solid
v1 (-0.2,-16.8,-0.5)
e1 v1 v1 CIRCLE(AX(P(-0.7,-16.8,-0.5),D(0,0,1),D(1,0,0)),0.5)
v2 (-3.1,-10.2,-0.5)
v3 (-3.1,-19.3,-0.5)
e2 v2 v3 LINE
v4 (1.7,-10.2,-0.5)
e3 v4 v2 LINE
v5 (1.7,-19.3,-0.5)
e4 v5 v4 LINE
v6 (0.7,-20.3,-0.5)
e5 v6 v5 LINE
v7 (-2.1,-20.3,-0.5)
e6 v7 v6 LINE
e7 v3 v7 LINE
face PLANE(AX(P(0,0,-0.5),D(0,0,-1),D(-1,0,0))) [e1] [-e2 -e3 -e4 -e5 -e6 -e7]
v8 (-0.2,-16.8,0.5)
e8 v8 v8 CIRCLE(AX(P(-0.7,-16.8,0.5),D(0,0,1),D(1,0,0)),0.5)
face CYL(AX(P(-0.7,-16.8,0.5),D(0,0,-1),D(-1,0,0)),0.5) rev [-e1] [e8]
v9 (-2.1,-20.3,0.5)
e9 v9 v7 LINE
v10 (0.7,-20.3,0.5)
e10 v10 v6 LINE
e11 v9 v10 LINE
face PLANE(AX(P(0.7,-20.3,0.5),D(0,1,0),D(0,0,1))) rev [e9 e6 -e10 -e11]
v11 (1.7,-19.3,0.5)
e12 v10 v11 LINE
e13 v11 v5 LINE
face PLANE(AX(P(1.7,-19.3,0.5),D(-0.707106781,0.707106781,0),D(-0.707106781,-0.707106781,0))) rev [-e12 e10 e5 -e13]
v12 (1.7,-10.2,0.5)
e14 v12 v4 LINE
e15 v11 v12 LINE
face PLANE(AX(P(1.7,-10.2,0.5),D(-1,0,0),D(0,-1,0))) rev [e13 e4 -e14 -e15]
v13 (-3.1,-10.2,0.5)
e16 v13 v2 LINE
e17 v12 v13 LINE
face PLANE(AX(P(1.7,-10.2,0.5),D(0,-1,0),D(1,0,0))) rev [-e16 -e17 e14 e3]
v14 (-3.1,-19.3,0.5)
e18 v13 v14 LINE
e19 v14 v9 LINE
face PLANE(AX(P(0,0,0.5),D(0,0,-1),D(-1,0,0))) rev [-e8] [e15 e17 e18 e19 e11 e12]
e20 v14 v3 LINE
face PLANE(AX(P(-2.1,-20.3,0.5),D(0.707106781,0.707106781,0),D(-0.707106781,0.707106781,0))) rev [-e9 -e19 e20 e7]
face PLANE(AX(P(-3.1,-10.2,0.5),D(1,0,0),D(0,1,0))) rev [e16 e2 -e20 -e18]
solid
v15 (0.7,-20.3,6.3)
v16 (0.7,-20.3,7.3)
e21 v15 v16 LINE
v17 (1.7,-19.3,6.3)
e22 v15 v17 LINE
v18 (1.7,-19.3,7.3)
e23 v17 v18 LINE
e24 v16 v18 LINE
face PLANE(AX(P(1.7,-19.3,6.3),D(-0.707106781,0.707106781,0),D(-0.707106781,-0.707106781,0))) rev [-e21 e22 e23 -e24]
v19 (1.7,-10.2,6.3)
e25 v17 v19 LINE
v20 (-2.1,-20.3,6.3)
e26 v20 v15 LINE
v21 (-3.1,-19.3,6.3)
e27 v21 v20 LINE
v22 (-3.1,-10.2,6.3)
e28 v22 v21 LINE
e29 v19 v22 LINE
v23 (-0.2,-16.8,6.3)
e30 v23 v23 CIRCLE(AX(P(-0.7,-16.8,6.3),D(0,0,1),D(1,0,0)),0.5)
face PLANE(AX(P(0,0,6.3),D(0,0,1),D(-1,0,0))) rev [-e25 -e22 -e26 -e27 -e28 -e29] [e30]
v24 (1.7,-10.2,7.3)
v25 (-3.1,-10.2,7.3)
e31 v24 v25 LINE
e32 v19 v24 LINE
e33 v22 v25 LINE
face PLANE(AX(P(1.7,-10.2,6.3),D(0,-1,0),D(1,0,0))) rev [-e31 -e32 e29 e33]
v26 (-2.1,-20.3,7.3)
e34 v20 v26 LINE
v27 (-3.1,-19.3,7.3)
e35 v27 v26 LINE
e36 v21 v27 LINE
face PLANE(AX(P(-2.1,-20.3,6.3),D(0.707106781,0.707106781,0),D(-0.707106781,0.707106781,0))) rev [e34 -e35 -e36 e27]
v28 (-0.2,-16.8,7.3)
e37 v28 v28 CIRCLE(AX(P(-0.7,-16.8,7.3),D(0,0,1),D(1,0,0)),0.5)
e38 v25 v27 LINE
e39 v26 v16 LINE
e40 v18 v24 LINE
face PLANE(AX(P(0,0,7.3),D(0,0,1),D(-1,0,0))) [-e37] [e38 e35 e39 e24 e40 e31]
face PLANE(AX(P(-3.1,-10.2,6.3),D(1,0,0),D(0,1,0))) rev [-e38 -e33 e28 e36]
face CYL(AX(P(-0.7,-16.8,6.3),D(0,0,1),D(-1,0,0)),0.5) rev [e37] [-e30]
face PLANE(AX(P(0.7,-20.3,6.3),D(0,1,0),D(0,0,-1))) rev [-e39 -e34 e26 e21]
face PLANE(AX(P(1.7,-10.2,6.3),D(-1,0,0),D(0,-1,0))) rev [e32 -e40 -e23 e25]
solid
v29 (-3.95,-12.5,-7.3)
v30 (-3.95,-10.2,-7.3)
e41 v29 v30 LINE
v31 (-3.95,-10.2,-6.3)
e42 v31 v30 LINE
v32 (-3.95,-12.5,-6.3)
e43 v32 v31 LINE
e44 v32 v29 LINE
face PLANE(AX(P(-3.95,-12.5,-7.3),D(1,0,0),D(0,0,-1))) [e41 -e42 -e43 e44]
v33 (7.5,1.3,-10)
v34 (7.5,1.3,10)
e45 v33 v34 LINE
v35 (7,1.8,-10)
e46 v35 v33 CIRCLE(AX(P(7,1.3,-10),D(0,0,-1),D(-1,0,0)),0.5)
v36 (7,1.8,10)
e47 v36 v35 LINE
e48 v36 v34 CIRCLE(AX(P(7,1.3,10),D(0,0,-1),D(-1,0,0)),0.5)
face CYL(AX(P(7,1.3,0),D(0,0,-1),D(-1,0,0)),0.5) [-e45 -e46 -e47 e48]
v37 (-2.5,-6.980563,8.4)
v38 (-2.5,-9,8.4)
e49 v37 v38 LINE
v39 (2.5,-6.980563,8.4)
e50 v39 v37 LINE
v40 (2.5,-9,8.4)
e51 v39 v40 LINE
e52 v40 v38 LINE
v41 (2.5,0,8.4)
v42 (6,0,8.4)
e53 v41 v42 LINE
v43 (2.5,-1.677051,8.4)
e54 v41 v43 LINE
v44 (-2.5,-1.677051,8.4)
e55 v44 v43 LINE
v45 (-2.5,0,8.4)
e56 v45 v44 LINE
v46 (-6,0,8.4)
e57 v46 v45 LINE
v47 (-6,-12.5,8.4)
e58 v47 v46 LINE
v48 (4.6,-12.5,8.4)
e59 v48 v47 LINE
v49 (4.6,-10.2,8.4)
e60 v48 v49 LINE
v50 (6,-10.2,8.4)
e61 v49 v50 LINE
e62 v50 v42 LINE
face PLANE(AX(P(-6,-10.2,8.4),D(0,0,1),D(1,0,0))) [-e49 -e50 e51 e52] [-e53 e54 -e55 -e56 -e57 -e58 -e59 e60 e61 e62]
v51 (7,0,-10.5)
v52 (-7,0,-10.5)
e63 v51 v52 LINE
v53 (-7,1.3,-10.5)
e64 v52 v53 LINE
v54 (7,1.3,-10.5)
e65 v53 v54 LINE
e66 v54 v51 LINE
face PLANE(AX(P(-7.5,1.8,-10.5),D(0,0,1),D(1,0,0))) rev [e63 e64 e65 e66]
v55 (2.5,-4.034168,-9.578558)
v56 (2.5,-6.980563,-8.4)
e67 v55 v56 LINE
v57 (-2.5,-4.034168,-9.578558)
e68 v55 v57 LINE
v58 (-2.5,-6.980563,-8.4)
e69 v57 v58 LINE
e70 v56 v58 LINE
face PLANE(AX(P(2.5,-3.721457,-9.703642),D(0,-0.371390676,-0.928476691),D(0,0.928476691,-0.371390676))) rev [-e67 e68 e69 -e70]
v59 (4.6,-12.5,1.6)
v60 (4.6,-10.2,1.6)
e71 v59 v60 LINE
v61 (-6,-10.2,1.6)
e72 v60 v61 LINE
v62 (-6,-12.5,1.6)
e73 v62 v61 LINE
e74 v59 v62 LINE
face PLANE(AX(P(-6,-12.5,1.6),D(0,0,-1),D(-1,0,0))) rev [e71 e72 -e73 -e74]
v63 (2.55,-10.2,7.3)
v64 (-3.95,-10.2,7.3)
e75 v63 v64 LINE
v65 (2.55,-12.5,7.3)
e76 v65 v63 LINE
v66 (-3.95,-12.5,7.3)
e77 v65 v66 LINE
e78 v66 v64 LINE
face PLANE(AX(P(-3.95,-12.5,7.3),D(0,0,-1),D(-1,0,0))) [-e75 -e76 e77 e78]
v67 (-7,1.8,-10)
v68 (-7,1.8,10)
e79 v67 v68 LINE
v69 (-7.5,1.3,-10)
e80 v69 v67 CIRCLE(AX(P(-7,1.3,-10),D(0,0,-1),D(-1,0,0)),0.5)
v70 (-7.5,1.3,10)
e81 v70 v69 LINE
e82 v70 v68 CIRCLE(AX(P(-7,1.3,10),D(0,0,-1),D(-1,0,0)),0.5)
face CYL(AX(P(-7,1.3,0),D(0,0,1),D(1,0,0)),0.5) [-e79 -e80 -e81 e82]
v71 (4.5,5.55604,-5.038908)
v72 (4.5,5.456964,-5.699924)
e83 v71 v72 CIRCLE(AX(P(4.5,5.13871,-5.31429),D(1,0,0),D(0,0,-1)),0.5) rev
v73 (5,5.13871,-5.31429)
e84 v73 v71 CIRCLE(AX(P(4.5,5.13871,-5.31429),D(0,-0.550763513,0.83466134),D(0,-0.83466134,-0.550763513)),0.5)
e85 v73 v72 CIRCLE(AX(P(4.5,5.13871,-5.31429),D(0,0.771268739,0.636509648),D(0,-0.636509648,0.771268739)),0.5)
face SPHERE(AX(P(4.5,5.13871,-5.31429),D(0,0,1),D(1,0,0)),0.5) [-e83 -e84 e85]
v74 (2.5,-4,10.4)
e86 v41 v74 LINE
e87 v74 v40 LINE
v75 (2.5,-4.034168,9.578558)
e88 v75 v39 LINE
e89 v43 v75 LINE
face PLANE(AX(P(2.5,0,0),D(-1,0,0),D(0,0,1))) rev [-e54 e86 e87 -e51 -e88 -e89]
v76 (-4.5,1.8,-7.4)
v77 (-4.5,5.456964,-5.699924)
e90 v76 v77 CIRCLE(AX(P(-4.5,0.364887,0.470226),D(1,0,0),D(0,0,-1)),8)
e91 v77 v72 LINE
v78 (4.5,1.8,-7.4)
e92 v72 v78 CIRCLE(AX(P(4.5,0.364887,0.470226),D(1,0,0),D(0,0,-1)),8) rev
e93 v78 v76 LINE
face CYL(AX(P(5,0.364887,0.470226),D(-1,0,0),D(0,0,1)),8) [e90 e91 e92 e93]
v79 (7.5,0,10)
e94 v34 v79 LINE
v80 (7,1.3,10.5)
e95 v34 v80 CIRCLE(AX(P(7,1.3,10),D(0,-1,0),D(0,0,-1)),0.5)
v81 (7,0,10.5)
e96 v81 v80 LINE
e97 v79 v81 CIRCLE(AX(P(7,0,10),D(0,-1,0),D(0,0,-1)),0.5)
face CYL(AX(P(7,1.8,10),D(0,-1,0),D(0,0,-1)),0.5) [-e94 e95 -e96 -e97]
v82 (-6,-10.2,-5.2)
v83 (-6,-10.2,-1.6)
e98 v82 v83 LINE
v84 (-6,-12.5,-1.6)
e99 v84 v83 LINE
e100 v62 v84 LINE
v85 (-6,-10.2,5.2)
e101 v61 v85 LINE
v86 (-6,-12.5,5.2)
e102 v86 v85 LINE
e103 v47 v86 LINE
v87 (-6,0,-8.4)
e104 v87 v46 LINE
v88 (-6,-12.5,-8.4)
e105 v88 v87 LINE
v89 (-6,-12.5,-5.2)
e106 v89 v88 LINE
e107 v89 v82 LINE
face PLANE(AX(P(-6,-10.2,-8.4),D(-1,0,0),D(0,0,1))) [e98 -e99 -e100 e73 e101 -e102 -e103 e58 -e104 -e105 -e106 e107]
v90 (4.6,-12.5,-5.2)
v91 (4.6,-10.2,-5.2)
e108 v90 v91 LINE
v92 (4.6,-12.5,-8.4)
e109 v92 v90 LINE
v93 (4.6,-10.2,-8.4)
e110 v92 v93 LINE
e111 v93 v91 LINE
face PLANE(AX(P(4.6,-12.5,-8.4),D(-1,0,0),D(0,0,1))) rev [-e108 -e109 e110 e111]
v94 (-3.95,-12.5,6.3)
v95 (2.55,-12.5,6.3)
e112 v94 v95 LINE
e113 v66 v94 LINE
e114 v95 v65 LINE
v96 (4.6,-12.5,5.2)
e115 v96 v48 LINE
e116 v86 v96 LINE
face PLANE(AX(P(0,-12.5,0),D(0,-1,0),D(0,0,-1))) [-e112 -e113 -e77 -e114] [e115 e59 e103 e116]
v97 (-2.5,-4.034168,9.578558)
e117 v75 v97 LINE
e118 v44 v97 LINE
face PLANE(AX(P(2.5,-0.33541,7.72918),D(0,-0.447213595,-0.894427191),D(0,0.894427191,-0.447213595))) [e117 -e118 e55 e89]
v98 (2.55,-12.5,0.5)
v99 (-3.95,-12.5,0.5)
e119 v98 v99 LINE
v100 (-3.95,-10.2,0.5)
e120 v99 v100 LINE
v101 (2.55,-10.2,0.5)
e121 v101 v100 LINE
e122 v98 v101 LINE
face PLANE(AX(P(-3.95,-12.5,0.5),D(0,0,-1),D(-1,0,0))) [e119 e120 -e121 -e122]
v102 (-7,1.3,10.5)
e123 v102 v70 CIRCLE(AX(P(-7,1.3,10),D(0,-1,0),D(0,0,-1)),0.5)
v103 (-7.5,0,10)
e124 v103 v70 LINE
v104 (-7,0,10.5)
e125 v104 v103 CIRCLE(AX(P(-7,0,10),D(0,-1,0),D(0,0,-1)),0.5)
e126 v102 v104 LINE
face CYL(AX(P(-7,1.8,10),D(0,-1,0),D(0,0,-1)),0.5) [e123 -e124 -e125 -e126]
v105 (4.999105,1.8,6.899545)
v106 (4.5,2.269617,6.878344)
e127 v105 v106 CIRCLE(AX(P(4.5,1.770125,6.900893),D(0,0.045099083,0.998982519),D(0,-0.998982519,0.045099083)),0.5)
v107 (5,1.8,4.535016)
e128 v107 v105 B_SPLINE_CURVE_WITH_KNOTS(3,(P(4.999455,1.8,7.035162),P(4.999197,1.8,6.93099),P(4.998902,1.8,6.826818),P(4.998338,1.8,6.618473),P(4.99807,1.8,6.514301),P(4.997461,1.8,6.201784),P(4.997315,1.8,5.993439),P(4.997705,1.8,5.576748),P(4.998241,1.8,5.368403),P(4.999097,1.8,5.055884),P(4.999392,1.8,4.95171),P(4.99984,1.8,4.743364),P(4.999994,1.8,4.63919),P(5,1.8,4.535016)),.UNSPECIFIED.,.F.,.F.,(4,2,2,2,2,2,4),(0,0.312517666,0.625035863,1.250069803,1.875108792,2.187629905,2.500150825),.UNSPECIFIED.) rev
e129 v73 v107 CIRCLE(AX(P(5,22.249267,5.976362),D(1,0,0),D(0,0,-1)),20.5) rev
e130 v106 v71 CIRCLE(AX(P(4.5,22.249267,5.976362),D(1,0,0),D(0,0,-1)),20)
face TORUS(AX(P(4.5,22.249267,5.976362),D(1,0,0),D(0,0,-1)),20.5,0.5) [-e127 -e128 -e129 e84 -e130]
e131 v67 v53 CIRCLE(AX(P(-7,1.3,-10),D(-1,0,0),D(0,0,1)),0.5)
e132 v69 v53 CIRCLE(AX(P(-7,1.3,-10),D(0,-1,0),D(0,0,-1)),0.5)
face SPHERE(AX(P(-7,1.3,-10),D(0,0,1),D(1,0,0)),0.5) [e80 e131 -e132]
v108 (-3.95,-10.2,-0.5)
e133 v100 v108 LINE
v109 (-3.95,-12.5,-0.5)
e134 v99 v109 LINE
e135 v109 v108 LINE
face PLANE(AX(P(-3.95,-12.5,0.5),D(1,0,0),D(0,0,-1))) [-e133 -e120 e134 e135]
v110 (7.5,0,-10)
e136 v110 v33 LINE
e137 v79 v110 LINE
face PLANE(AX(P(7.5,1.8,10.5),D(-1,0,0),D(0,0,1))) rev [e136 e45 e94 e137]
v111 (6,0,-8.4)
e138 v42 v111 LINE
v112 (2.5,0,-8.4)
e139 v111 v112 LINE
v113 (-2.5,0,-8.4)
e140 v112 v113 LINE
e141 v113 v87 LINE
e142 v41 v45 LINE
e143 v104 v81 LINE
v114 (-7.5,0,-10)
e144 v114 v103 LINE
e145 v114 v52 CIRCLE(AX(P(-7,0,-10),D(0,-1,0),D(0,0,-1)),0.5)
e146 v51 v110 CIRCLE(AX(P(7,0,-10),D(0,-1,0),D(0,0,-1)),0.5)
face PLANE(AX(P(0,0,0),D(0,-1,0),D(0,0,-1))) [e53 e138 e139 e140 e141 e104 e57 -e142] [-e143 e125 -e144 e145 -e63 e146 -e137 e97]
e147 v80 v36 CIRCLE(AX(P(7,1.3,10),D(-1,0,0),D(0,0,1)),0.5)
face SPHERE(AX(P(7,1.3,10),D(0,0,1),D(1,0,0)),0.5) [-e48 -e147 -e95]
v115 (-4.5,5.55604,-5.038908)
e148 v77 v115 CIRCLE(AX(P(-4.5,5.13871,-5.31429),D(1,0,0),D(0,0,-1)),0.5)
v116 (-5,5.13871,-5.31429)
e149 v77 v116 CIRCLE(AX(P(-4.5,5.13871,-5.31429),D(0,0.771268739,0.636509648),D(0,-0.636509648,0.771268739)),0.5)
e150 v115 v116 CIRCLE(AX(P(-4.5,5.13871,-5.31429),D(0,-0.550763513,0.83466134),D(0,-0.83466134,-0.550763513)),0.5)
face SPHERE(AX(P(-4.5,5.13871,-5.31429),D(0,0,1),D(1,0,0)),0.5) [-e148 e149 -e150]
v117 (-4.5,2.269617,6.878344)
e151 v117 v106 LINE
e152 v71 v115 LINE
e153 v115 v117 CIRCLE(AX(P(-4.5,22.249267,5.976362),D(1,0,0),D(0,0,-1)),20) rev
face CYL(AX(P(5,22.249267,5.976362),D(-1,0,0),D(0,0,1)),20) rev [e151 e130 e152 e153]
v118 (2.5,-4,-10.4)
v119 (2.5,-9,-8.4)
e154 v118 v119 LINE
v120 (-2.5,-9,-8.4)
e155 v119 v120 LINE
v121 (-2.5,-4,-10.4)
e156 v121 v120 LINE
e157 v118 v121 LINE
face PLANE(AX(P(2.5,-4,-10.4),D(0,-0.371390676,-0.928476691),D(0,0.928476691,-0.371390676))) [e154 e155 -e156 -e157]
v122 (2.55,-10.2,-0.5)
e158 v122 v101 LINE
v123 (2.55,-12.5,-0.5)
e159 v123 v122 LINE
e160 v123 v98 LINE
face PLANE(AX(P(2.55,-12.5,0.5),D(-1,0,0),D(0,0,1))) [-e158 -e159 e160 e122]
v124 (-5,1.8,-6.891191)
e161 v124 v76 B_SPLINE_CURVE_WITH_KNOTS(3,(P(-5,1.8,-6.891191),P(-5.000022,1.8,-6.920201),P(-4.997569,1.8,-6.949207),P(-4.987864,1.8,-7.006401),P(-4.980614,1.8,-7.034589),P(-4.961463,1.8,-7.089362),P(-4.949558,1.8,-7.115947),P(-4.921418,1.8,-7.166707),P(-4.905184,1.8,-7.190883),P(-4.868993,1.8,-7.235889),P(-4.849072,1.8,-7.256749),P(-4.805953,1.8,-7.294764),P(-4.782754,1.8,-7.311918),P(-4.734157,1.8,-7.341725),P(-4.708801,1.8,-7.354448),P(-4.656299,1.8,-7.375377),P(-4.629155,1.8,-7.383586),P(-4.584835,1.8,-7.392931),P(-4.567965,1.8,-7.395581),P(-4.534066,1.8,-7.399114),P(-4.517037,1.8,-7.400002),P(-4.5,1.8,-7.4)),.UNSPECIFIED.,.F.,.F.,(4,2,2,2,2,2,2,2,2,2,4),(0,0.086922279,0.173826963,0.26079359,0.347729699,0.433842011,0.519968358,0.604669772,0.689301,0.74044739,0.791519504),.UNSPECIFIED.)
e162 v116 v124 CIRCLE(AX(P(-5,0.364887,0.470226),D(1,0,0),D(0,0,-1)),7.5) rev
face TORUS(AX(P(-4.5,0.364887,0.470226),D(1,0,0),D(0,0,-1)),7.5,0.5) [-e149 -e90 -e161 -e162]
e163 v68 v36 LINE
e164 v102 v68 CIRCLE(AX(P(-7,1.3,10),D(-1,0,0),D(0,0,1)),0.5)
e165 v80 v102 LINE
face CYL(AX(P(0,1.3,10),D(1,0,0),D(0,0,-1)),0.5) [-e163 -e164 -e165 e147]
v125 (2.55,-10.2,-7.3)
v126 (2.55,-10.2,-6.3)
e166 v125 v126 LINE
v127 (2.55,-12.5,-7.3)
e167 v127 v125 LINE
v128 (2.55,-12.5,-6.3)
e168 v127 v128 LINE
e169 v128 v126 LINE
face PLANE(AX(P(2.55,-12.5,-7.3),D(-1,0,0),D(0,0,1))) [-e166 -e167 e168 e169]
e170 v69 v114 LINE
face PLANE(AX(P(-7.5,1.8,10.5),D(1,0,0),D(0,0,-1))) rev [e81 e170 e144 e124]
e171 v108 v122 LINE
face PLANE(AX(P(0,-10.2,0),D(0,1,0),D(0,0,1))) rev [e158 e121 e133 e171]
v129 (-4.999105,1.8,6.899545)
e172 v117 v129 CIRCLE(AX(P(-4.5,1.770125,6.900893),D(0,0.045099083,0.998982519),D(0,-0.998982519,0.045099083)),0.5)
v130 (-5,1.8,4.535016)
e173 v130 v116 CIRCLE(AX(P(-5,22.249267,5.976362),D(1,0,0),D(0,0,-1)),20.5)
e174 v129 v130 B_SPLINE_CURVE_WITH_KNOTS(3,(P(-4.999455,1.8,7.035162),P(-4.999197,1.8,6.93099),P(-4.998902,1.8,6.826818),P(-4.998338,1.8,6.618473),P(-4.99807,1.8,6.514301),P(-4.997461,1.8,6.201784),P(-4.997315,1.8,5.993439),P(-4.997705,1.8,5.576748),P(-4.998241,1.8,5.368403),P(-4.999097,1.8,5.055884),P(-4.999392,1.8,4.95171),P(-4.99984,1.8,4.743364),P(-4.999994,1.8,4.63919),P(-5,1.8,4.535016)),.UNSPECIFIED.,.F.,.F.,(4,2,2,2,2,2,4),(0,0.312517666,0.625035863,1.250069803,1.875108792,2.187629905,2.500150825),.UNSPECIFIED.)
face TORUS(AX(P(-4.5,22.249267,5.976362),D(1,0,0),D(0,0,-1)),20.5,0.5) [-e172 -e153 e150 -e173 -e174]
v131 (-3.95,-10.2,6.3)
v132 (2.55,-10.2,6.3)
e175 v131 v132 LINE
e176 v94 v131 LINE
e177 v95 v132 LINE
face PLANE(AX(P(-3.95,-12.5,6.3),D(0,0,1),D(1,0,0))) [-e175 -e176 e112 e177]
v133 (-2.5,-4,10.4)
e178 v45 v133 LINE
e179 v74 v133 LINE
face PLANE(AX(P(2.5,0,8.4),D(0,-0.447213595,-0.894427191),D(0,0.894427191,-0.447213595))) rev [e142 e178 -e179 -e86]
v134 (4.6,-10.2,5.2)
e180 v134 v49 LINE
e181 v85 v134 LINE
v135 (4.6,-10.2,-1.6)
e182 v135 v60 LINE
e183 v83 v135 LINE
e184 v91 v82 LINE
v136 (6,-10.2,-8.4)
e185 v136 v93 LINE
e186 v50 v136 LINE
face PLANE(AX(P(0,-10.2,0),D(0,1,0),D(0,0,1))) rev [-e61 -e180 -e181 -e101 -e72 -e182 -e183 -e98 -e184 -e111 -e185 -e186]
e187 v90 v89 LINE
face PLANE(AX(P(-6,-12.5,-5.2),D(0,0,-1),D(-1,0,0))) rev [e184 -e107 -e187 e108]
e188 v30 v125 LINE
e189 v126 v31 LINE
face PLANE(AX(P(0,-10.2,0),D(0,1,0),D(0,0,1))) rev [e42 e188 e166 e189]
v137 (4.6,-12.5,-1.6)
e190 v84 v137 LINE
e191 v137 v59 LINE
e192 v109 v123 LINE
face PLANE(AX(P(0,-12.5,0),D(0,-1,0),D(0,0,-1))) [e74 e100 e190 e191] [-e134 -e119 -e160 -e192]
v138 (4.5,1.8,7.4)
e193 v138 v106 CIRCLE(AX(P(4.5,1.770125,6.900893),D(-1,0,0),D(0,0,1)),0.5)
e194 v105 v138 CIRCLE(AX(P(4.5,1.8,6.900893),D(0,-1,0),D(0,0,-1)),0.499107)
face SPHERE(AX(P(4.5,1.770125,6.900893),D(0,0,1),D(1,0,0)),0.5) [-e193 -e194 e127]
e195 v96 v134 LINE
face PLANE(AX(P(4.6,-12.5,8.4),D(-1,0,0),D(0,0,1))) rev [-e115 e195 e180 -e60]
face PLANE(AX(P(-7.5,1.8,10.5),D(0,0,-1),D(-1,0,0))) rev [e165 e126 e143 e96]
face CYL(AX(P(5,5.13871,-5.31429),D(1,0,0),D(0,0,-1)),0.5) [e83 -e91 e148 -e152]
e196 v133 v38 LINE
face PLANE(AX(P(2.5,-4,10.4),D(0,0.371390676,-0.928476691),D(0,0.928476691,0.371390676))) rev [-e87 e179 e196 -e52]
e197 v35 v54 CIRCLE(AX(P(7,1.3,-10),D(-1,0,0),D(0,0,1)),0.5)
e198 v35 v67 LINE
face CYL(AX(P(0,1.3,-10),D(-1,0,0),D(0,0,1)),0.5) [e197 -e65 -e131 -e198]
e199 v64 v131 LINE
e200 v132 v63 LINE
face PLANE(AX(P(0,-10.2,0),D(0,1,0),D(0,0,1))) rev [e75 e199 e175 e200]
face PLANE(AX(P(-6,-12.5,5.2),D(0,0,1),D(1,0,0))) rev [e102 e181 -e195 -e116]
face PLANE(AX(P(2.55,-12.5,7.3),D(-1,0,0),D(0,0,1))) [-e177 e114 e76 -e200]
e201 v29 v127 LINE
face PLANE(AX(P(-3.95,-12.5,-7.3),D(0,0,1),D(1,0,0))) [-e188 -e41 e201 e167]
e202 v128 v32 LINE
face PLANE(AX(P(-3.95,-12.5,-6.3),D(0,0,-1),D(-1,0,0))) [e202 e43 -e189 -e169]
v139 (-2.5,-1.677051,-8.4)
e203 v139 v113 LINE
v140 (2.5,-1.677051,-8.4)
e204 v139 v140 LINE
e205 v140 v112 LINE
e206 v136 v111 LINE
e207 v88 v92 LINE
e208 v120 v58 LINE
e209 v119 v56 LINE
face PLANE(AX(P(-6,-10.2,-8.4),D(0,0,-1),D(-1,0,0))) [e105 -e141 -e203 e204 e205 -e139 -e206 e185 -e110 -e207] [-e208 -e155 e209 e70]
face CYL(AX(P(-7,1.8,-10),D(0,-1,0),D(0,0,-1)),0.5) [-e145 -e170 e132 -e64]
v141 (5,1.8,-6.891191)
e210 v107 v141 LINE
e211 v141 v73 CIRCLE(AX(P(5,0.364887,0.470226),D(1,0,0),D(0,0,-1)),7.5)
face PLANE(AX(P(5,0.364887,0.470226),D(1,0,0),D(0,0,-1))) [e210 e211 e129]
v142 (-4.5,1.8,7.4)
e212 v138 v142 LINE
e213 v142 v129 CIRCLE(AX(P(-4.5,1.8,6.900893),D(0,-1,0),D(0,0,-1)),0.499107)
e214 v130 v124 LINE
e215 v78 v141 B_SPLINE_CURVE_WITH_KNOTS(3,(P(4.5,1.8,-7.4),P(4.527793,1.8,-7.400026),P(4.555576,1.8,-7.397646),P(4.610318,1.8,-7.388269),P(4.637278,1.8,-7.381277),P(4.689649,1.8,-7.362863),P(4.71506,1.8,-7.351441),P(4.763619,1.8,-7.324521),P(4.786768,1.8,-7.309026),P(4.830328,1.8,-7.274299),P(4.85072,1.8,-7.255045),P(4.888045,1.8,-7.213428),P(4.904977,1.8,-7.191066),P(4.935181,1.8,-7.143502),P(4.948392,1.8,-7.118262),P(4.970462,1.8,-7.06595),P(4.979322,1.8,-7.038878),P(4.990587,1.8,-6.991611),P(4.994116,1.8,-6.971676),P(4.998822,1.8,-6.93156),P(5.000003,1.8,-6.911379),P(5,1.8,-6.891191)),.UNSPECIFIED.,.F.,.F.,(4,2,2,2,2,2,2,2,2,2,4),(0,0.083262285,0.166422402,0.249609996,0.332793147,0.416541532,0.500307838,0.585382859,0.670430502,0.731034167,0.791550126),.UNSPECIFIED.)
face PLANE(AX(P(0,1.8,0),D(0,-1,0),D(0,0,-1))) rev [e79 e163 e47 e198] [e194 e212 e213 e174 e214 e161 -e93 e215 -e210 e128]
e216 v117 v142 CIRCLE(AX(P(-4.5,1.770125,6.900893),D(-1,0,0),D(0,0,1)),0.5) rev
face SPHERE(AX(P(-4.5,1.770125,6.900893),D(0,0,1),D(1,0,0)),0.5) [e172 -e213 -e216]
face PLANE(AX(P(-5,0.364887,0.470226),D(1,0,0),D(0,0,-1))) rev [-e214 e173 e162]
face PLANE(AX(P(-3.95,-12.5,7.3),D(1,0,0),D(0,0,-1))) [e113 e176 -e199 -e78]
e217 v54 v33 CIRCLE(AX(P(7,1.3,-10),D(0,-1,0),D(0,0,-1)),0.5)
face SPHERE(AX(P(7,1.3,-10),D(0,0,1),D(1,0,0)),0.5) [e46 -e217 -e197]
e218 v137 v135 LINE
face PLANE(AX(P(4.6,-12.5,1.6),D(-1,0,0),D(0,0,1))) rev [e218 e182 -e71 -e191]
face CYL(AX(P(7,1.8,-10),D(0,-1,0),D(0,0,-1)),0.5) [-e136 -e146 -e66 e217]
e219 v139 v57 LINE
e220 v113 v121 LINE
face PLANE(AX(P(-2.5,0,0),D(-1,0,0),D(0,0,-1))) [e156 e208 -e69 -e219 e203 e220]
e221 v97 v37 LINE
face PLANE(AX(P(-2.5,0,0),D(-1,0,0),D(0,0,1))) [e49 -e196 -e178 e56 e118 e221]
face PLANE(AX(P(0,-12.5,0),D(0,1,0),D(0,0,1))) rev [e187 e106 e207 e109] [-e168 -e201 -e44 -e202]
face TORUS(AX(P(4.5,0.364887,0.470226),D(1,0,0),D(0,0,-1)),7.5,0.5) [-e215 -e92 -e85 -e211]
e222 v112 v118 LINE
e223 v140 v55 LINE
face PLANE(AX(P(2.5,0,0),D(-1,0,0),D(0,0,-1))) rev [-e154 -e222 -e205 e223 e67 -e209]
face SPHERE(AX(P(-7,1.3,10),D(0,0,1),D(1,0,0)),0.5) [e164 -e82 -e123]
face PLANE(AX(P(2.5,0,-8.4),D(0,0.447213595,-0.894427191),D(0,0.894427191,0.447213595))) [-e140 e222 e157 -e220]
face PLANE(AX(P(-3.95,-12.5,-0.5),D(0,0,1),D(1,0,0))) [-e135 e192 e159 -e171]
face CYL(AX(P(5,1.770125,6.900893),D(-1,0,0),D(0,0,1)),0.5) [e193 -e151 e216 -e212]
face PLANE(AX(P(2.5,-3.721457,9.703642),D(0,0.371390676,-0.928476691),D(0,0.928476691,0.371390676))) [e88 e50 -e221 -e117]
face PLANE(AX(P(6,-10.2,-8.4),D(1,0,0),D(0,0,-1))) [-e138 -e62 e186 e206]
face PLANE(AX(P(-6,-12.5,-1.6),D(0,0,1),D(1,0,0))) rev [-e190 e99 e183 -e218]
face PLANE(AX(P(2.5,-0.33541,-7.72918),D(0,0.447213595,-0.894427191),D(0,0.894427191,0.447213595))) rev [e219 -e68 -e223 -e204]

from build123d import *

# Parameters (mm, degrees)
SKETCH1_W           = 15
SKETCH1_H           = 21
BOSS_EXTRUDE1_DEPTH = 1.8
SKETCH2_W           = 12
SKETCH2_H           = 16.8
BOSS_EXTRUDE2_DEPTH = 10.2
SKETCH3_W           = 10.6
SKETCH3_H           = 3.2
SKETCH3_W_2         = 6.5
SKETCH3_H_2         = 1
BOSS_EXTRUDE3_DEPTH = 2.3
SKETCH4_R           = 0.5
BOSS_EXTRUDE4_DEPTH = 1
EXTRUDE_THIN1_DEPTH = 2.5
BOSS_EXTRUDE5_DEPTH = 5
FILLET1_R           = 0.5
FILLET2_R           = 0.5


with BuildPart() as part:
    # Sketch1 → Boss-Extrude1 (new body)
    with BuildSketch(Plane(origin=(0, 0, 0), x_dir=(1, 0, 0), z_dir=(0, 1, 0))):
        Rectangle(SKETCH1_W, SKETCH1_H)
    extrude(amount=BOSS_EXTRUDE1_DEPTH)

    # Sketch2 → Boss-Extrude2 (add)
    with BuildSketch(Plane(origin=(0, 0, 0), x_dir=(1, 0, 0), z_dir=(0, 1, 0))):
        Rectangle(SKETCH2_W, SKETCH2_H)
    extrude(amount=-BOSS_EXTRUDE2_DEPTH)

    # Sketch3 → Boss-Extrude3 (add)
    # profile 1 of 3: a face of its own
    with BuildSketch(Plane.XZ.offset(10.2)):
        with Locations((-0.7, 6.8)):
            Rectangle(SKETCH3_W, SKETCH3_H)
        with Locations((-0.7, 6.8)):
            Rectangle(SKETCH3_W_2, SKETCH3_H_2, mode=Mode.SUBTRACT)
    # profile 2 of 3: a face of its own
    with BuildSketch(Plane.XZ.offset(10.2)):
        with Locations((-0.7, -6.8)):
            Rectangle(SKETCH3_W, SKETCH3_H)
        with Locations((-0.7, -6.8)):
            Rectangle(SKETCH3_W_2, SKETCH3_H_2, mode=Mode.SUBTRACT)
    # profile 3 of 3: a face of its own
    with BuildSketch(Plane.XZ.offset(10.2)):
        with Locations((-0.7, 0)):
            Rectangle(SKETCH3_W, SKETCH3_H)
        with Locations((-0.7, 0)):
            Rectangle(SKETCH3_W_2, SKETCH3_H_2, mode=Mode.SUBTRACT)
    extrude(amount=BOSS_EXTRUDE3_DEPTH)

    # Sketch5 → Extrude-Thin1 (add, symmetric)
    with BuildSketch(Plane(origin=(0, 0, 0), x_dir=(0, 0, -1), z_dir=(1, 0, 0))):
        Polygon((-8.4, 0), (-10.4, -4), (-8.4, -9), (-7.703642482, -8.721456993), (-9.57855827, -4.034167523), (-7.729179607, -0.335410197), align=None)
    extrude_thin1 = extrude(amount=EXTRUDE_THIN1_DEPTH, both=True)

    # Mirror2: Extrude-Thin1 across plane
    add(extrude_thin1.mirror(Plane.XY))

    # Sketch6 → Boss-Extrude5 (add, symmetric)
    with BuildSketch(Plane(origin=(0, 0, 0), x_dir=(0, 0, -1), z_dir=(1, 0, 0))):
        with BuildLine():
            Line((-7.4, 2.3), (-7.4, 1.8))
            Line((-7.4, 1.8), (7.4, 1.8))
            ThreePointArc((7.4, 1.8), (6.685191913, 3.942595957), (5.4, 5.8))
            ThreePointArc((5.4, 5.8), (-0.701262123, 2.957472908), (-7.4, 2.3))
        make_face()
    extrude(amount=BOSS_EXTRUDE5_DEPTH, both=True)

    # Fillet1
    # the kernel refuses this fillet: 0.5 mm, written as the material it takes off along each edge
    with BuildSketch(Plane(origin=(6.139155456, 5.8, -5.4), x_dir=(0, -0.7528288222325751, -0.658216350766155), z_dir=(-1, 0, 0))) as fillet1_piece_1:
        with BuildLine():
            CenterArc((0.441422739, 0.499797197), FILLET1_R, 187.744574116, 83.887366527)
            ThreePointArc((-0.054016593, 0.43241865), (-0.025830517, 0.21635645), (0, 0))
            ThreePointArc((0, 0), (0.227831091, -0.003244846), (0.455662182, 0))
        make_face()
    extrude(amount=12.278310911, mode=Mode.SUBTRACT)
    with BuildSketch(Plane(origin=(7.5, -1.25, -10.5), x_dir=(0, 0, 1), z_dir=(0, 1, 0)), Plane(origin=(7.5, -1.25, 10.5), x_dir=(-1, 0, 0), z_dir=(0, 1, 0))) as fillet1_piece_2:
        with BuildLine():
            CenterArc((FILLET1_R, -FILLET1_R), FILLET1_R, 90, 90)
            Line((0, -FILLET1_R), (0, 0))
            Line((0, 0), (FILLET1_R, 0))
        make_face()
    extrude(amount=4.3, mode=Mode.SUBTRACT)
    with BuildSketch(Plane(origin=(-7.5, -1.25, 10.5), x_dir=(1, 0, 0), z_dir=(0, 1, 0)), Plane(origin=(-7.5, -1.25, -10.5), x_dir=(0, 0, 1), z_dir=(0, 1, 0))) as fillet1_piece_3:
        with BuildLine():
            CenterArc((FILLET1_R, FILLET1_R), FILLET1_R, 180, 90)
            Line((0, FILLET1_R), (0, 0))
            Line((0, 0), (FILLET1_R, 0))
        make_face()
    extrude(amount=4.3, mode=Mode.SUBTRACT)
    with BuildSketch(Plane(origin=(6.324787276, 2.3, 7.4), x_dir=(0, -1, 0), z_dir=(-1, 0, 0))) as fillet1_piece_4_section:
        with BuildLine():
            CenterArc((0.529914911, -0.5), FILLET1_R, 90, 92.582364675)
            ThreePointArc((0.030422668, -0.522527754), (0.016920767, -0.26116435), (0, 0))
            Line((0, 0), (0.529914911, 0))
        make_face()
    fillet1_piece_4 = extrude(amount=12.649574553, mode=Mode.PRIVATE)
    fillet1_piece_4 = split(fillet1_piece_4, bisect_by=Plane(origin=(0, 1.8, 7.280360026), z_dir=(0, 1, 0)), keep=Keep.TOP, mode=Mode.PRIVATE)
    add(fillet1_piece_4, mode=Mode.SUBTRACT)

    # Fillet2
    # the kernel refuses this fillet: 0.5 mm, written as the material it takes off along each edge
    with BuildSketch(Plane(origin=(-5, 0.364887193, 0.470225615), x_dir=(0, 0.024106503791178756, -0.999709396012144), z_dir=(0, -0.999709396012144, -0.024106503791178756))) as fillet2_piece_1_section:
        with BuildLine():
            CenterArc((8 - FILLET2_R, FILLET2_R), FILLET2_R, 270, 90)
            Line((8 - FILLET2_R, 0), (8, 0))
            Line((8, 0), (8, FILLET2_R))
        make_face()
    fillet2_piece_1 = revolve(axis=Axis((-5, 0.364887193, 0.470225615), (1, 0, 0)), revolution_arc=38.150707639, mode=Mode.PRIVATE)
    fillet2_piece_1 = split(fillet2_piece_1, bisect_by=Plane(origin=(-4.858036818, 1.8, -6.655446505), z_dir=(0, 1, 0)), keep=Keep.TOP, mode=Mode.PRIVATE)
    add(fillet2_piece_1, mode=Mode.SUBTRACT)
    with BuildSketch(Plane(origin=(5, 0.364887193, 0.470225615), x_dir=(0, 0.024106503791178756, -0.999709396012144), z_dir=(0, -0.999709396012144, -0.024106503791178756))) as fillet2_piece_2_section:
        with BuildLine():
            CenterArc((8 - FILLET2_R, -FILLET2_R), FILLET2_R, 0, 90)
            Line((8, -FILLET2_R), (8, 0))
            Line((8, 0), (8 - FILLET2_R, 0))
        make_face()
    fillet2_piece_2 = revolve(axis=Axis((5, 0.364887193, 0.470225615), (1, 0, 0)), revolution_arc=38.150707639, mode=Mode.PRIVATE)
    fillet2_piece_2 = split(fillet2_piece_2, bisect_by=Plane(origin=(4.858036818, 1.8, -6.655446505), z_dir=(0, 1, 0)), keep=Keep.TOP, mode=Mode.PRIVATE)
    add(fillet2_piece_2, mode=Mode.SUBTRACT)
    with BuildSketch(Plane(origin=(-5, 22.249267031, 5.976362079), x_dir=(0, -0.8346613404304445, -0.5507635125812654), z_dir=(0, 0.5507635125812654, -0.8346613404304445))) as fillet2_piece_3_section:
        with BuildLine():
            CenterArc((20 + FILLET2_R, -FILLET2_R), FILLET2_R, 90, 90)
            Line((20, -FILLET2_R), (20, 0))
            Line((20, 0), (20 + FILLET2_R, 0))
        make_face()
    fillet2_piece_3 = revolve(axis=Axis((-5, 22.249267031, 5.976362079), (-1, 0, 0)), revolution_arc=36.001773577, mode=Mode.PRIVATE)
    fillet2_piece_3 = split(fillet2_piece_3, bisect_by=Plane(origin=(-4.860130529, 1.8, 0.621819924), z_dir=(0, 1, 0)), keep=Keep.TOP, mode=Mode.PRIVATE)
    add(fillet2_piece_3, mode=Mode.SUBTRACT)
    with BuildSketch(Plane(origin=(-5, 5.138709552, -5.314289929), x_dir=(0, 0.6365096479350569, -0.7712687392119495), z_dir=(0, -0.7712687392119495, -0.6365096479350569))) as fillet2_piece_4:
        with BuildLine():
            CenterArc((0.5 - FILLET2_R, FILLET2_R), FILLET2_R, 270, 90)
            Line((0.5, FILLET2_R), (0.5, 0))
            Line((0.5, 0), (0.5 - FILLET2_R, 0))
        make_face()
    revolve(axis=Axis((-5, 5.138709552, -5.314289929), (1, 0, 0)), revolution_arc=83.887366527, mode=Mode.SUBTRACT)
    with BuildSketch(Plane(origin=(-5, 1.770085089, 6.9), x_dir=(0, 0.998984484948098, -0.04505550835340167), z_dir=(0, -0.04505550835340167, -0.998984484948098))) as fillet2_piece_5_section:
        with BuildLine():
            CenterArc((0.5 - FILLET2_R, FILLET2_R), FILLET2_R, 270, 90)
            Line((0.5, FILLET2_R), (0.5, 0))
            Line((0.5, 0), (0.5 - FILLET2_R, 0))
        make_face()
    fillet2_piece_5 = revolve(axis=Axis((-5, 1.770085089, 6.9), (1, 0, 0)), revolution_arc=232.448230123, mode=Mode.PRIVATE)
    fillet2_piece_5 = split(fillet2_piece_5, bisect_by=Plane(origin=(-4.868015463, 1.8, 7.151178775), z_dir=(0, 1, 0)), keep=Keep.TOP, mode=Mode.PRIVATE)
    add(fillet2_piece_5, mode=Mode.SUBTRACT)
    with BuildSketch(Plane(origin=(5, 22.249267031, 5.976362079), x_dir=(0, -0.8346613404304445, -0.5507635125812654), z_dir=(0, 0.5507635125812654, -0.8346613404304445))) as fillet2_piece_6_section:
        with BuildLine():
            CenterArc((20 + FILLET2_R, FILLET2_R), FILLET2_R, 180, 90)
            Line((20, FILLET2_R), (20, 0))
            Line((20, 0), (20 + FILLET2_R, 0))
        make_face()
    fillet2_piece_6 = revolve(axis=Axis((5, 22.249267031, 5.976362079), (-1, 0, 0)), revolution_arc=36.001773577, mode=Mode.PRIVATE)
    fillet2_piece_6 = split(fillet2_piece_6, bisect_by=Plane(origin=(4.860130529, 1.8, 0.621819924), z_dir=(0, 1, 0)), keep=Keep.TOP, mode=Mode.PRIVATE)
    add(fillet2_piece_6, mode=Mode.SUBTRACT)
    with BuildSketch(Plane(origin=(5, 5.138709552, -5.314289929), x_dir=(0, 0.6365096479350569, -0.7712687392119495), z_dir=(0, -0.7712687392119495, -0.6365096479350569))) as fillet2_piece_7:
        with BuildLine():
            CenterArc((0.5 - FILLET2_R, -FILLET2_R), FILLET2_R, 0, 90)
            Line((0.5, -FILLET2_R), (0.5, 0))
            Line((0.5, 0), (0.5 - FILLET2_R, 0))
        make_face()
    revolve(axis=Axis((5, 5.138709552, -5.314289929), (1, 0, 0)), revolution_arc=83.887366527, mode=Mode.SUBTRACT)
    with BuildSketch(Plane(origin=(5, 1.770085089, 6.9), x_dir=(0, 0.998984484948098, -0.04505550835340167), z_dir=(0, -0.04505550835340167, -0.998984484948098))) as fillet2_piece_8_section:
        with BuildLine():
            CenterArc((0.5 - FILLET2_R, -FILLET2_R), FILLET2_R, 0, 90)
            Line((0.5, -FILLET2_R), (0.5, 0))
            Line((0.5, 0), (0.5 - FILLET2_R, 0))
        make_face()
    fillet2_piece_8 = revolve(axis=Axis((5, 1.770085089, 6.9), (1, 0, 0)), revolution_arc=232.448230123, mode=Mode.PRIVATE)
    fillet2_piece_8 = split(fillet2_piece_8, bisect_by=Plane(origin=(4.868015462, 1.8, 7.151178777), z_dir=(0, 1, 0)), keep=Keep.TOP, mode=Mode.PRIVATE)
    add(fillet2_piece_8, mode=Mode.SUBTRACT)
    with BuildSketch(Plane(origin=(7, 1.8, -10.5), x_dir=(0, 0, 1), z_dir=(-1, 0, 0))) as fillet2_piece_9:
        with BuildLine():
            CenterArc((FILLET2_R, -FILLET2_R), FILLET2_R, 90, 90)
            Line((0, -FILLET2_R), (0, 0))
            Line((0, 0), (FILLET2_R, 0))
        make_face()
    extrude(amount=14, mode=Mode.SUBTRACT)
    with BuildSketch(Plane(origin=(7.5, 1.8, 10), x_dir=(-1, 0, 0), z_dir=(0, 0, -1)), Plane(origin=(-7.5, 1.8, -10), x_dir=(1, 0, 0), z_dir=(0, 0, 1))) as fillet2_piece_10:
        with BuildLine():
            CenterArc((FILLET2_R, -FILLET2_R), FILLET2_R, 90, 90)
            Line((0, -FILLET2_R), (0, 0))
            Line((0, 0), (FILLET2_R, 0))
        make_face()
    extrude(amount=20, mode=Mode.SUBTRACT)
    with BuildSketch(Plane(origin=(-7, 1.8, 10.5), x_dir=(0, -1, 0), z_dir=(1, 0, 0))) as fillet2_piece_11:
        with BuildLine():
            CenterArc((FILLET2_R, FILLET2_R), FILLET2_R, 180, 90)
            Line((0, FILLET2_R), (0, 0))
            Line((0, 0), (FILLET2_R, 0))
        make_face()
    extrude(amount=14, mode=Mode.SUBTRACT)
    with BuildSketch(Plane(origin=(-7, 1.8, -10), x_dir=(-1, 0, 0), z_dir=(0, 0, 1))) as fillet2_piece_12:
        with BuildLine():
            CenterArc((0.5 - FILLET2_R, FILLET2_R), FILLET2_R, 270, 90)
            Line((0.5, FILLET2_R), (0.5, 0))
            Line((0.5, 0), (0.5 - FILLET2_R, 0))
        make_face()
    revolve(axis=Axis((-7, 1.8, -10), (0, -1, 0)), revolution_arc=90, mode=Mode.SUBTRACT)
    with BuildSketch(Plane(origin=(-7, 1.8, 10), x_dir=(0, 0, 1), z_dir=(1, 0, 0))) as fillet2_piece_13:
        with BuildLine():
            CenterArc((0.5 - FILLET2_R, FILLET2_R), FILLET2_R, 270, 90)
            Line((0.5, FILLET2_R), (0.5, 0))
            Line((0.5, 0), (0.5 - FILLET2_R, 0))
        make_face()
    revolve(axis=Axis((-7, 1.8, 10), (0, -1, 0)), revolution_arc=90, mode=Mode.SUBTRACT)
    with BuildSketch(Plane(origin=(7, 1.8, 10), x_dir=(1, 0, 0), z_dir=(0, 0, -1))) as fillet2_piece_14:
        with BuildLine():
            CenterArc((0.5 - FILLET2_R, FILLET2_R), FILLET2_R, 270, 90)
            Line((0.5 - FILLET2_R, 0), (0.5, 0))
            Line((0.5, 0), (0.5, FILLET2_R))
        make_face()
    revolve(axis=Axis((7, 1.8, 10), (0, -1, 0)), revolution_arc=90, mode=Mode.SUBTRACT)
    with BuildSketch(Plane(origin=(7, 1.8, -10), x_dir=(0, 0, -1), z_dir=(-1, 0, 0))) as fillet2_piece_15:
        with BuildLine():
            CenterArc((0.5 - FILLET2_R, FILLET2_R), FILLET2_R, 270, 90)
            Line((0.5, FILLET2_R), (0.5, 0))
            Line((0.5, 0), (0.5 - FILLET2_R, 0))
        make_face()
    revolve(axis=Axis((7, 1.8, -10), (0, -1, 0)), revolution_arc=90, mode=Mode.SUBTRACT)


with BuildPart() as body_2:
    # Sketch4 → Boss-Extrude4 (new body)
    with BuildSketch(Plane.XY.offset(-0.5)):
        Polygon((1.7, -10.2), (-3.1, -10.2), (-3.1, -19.3), (-2.1, -20.3), (0.7, -20.3), (1.7, -19.3), align=None)
        with Locations((-0.7, -16.8)):
            Circle(SKETCH4_R, mode=Mode.SUBTRACT)
    extrude(amount=BOSS_EXTRUDE4_DEPTH)


with BuildPart() as body_3:
    # Mirror1: mirrored copy
    add(body_2.part.mirror(Plane.XY.offset(3.4)))


solid = Compound([part.part, body_2.part, body_3.part])
